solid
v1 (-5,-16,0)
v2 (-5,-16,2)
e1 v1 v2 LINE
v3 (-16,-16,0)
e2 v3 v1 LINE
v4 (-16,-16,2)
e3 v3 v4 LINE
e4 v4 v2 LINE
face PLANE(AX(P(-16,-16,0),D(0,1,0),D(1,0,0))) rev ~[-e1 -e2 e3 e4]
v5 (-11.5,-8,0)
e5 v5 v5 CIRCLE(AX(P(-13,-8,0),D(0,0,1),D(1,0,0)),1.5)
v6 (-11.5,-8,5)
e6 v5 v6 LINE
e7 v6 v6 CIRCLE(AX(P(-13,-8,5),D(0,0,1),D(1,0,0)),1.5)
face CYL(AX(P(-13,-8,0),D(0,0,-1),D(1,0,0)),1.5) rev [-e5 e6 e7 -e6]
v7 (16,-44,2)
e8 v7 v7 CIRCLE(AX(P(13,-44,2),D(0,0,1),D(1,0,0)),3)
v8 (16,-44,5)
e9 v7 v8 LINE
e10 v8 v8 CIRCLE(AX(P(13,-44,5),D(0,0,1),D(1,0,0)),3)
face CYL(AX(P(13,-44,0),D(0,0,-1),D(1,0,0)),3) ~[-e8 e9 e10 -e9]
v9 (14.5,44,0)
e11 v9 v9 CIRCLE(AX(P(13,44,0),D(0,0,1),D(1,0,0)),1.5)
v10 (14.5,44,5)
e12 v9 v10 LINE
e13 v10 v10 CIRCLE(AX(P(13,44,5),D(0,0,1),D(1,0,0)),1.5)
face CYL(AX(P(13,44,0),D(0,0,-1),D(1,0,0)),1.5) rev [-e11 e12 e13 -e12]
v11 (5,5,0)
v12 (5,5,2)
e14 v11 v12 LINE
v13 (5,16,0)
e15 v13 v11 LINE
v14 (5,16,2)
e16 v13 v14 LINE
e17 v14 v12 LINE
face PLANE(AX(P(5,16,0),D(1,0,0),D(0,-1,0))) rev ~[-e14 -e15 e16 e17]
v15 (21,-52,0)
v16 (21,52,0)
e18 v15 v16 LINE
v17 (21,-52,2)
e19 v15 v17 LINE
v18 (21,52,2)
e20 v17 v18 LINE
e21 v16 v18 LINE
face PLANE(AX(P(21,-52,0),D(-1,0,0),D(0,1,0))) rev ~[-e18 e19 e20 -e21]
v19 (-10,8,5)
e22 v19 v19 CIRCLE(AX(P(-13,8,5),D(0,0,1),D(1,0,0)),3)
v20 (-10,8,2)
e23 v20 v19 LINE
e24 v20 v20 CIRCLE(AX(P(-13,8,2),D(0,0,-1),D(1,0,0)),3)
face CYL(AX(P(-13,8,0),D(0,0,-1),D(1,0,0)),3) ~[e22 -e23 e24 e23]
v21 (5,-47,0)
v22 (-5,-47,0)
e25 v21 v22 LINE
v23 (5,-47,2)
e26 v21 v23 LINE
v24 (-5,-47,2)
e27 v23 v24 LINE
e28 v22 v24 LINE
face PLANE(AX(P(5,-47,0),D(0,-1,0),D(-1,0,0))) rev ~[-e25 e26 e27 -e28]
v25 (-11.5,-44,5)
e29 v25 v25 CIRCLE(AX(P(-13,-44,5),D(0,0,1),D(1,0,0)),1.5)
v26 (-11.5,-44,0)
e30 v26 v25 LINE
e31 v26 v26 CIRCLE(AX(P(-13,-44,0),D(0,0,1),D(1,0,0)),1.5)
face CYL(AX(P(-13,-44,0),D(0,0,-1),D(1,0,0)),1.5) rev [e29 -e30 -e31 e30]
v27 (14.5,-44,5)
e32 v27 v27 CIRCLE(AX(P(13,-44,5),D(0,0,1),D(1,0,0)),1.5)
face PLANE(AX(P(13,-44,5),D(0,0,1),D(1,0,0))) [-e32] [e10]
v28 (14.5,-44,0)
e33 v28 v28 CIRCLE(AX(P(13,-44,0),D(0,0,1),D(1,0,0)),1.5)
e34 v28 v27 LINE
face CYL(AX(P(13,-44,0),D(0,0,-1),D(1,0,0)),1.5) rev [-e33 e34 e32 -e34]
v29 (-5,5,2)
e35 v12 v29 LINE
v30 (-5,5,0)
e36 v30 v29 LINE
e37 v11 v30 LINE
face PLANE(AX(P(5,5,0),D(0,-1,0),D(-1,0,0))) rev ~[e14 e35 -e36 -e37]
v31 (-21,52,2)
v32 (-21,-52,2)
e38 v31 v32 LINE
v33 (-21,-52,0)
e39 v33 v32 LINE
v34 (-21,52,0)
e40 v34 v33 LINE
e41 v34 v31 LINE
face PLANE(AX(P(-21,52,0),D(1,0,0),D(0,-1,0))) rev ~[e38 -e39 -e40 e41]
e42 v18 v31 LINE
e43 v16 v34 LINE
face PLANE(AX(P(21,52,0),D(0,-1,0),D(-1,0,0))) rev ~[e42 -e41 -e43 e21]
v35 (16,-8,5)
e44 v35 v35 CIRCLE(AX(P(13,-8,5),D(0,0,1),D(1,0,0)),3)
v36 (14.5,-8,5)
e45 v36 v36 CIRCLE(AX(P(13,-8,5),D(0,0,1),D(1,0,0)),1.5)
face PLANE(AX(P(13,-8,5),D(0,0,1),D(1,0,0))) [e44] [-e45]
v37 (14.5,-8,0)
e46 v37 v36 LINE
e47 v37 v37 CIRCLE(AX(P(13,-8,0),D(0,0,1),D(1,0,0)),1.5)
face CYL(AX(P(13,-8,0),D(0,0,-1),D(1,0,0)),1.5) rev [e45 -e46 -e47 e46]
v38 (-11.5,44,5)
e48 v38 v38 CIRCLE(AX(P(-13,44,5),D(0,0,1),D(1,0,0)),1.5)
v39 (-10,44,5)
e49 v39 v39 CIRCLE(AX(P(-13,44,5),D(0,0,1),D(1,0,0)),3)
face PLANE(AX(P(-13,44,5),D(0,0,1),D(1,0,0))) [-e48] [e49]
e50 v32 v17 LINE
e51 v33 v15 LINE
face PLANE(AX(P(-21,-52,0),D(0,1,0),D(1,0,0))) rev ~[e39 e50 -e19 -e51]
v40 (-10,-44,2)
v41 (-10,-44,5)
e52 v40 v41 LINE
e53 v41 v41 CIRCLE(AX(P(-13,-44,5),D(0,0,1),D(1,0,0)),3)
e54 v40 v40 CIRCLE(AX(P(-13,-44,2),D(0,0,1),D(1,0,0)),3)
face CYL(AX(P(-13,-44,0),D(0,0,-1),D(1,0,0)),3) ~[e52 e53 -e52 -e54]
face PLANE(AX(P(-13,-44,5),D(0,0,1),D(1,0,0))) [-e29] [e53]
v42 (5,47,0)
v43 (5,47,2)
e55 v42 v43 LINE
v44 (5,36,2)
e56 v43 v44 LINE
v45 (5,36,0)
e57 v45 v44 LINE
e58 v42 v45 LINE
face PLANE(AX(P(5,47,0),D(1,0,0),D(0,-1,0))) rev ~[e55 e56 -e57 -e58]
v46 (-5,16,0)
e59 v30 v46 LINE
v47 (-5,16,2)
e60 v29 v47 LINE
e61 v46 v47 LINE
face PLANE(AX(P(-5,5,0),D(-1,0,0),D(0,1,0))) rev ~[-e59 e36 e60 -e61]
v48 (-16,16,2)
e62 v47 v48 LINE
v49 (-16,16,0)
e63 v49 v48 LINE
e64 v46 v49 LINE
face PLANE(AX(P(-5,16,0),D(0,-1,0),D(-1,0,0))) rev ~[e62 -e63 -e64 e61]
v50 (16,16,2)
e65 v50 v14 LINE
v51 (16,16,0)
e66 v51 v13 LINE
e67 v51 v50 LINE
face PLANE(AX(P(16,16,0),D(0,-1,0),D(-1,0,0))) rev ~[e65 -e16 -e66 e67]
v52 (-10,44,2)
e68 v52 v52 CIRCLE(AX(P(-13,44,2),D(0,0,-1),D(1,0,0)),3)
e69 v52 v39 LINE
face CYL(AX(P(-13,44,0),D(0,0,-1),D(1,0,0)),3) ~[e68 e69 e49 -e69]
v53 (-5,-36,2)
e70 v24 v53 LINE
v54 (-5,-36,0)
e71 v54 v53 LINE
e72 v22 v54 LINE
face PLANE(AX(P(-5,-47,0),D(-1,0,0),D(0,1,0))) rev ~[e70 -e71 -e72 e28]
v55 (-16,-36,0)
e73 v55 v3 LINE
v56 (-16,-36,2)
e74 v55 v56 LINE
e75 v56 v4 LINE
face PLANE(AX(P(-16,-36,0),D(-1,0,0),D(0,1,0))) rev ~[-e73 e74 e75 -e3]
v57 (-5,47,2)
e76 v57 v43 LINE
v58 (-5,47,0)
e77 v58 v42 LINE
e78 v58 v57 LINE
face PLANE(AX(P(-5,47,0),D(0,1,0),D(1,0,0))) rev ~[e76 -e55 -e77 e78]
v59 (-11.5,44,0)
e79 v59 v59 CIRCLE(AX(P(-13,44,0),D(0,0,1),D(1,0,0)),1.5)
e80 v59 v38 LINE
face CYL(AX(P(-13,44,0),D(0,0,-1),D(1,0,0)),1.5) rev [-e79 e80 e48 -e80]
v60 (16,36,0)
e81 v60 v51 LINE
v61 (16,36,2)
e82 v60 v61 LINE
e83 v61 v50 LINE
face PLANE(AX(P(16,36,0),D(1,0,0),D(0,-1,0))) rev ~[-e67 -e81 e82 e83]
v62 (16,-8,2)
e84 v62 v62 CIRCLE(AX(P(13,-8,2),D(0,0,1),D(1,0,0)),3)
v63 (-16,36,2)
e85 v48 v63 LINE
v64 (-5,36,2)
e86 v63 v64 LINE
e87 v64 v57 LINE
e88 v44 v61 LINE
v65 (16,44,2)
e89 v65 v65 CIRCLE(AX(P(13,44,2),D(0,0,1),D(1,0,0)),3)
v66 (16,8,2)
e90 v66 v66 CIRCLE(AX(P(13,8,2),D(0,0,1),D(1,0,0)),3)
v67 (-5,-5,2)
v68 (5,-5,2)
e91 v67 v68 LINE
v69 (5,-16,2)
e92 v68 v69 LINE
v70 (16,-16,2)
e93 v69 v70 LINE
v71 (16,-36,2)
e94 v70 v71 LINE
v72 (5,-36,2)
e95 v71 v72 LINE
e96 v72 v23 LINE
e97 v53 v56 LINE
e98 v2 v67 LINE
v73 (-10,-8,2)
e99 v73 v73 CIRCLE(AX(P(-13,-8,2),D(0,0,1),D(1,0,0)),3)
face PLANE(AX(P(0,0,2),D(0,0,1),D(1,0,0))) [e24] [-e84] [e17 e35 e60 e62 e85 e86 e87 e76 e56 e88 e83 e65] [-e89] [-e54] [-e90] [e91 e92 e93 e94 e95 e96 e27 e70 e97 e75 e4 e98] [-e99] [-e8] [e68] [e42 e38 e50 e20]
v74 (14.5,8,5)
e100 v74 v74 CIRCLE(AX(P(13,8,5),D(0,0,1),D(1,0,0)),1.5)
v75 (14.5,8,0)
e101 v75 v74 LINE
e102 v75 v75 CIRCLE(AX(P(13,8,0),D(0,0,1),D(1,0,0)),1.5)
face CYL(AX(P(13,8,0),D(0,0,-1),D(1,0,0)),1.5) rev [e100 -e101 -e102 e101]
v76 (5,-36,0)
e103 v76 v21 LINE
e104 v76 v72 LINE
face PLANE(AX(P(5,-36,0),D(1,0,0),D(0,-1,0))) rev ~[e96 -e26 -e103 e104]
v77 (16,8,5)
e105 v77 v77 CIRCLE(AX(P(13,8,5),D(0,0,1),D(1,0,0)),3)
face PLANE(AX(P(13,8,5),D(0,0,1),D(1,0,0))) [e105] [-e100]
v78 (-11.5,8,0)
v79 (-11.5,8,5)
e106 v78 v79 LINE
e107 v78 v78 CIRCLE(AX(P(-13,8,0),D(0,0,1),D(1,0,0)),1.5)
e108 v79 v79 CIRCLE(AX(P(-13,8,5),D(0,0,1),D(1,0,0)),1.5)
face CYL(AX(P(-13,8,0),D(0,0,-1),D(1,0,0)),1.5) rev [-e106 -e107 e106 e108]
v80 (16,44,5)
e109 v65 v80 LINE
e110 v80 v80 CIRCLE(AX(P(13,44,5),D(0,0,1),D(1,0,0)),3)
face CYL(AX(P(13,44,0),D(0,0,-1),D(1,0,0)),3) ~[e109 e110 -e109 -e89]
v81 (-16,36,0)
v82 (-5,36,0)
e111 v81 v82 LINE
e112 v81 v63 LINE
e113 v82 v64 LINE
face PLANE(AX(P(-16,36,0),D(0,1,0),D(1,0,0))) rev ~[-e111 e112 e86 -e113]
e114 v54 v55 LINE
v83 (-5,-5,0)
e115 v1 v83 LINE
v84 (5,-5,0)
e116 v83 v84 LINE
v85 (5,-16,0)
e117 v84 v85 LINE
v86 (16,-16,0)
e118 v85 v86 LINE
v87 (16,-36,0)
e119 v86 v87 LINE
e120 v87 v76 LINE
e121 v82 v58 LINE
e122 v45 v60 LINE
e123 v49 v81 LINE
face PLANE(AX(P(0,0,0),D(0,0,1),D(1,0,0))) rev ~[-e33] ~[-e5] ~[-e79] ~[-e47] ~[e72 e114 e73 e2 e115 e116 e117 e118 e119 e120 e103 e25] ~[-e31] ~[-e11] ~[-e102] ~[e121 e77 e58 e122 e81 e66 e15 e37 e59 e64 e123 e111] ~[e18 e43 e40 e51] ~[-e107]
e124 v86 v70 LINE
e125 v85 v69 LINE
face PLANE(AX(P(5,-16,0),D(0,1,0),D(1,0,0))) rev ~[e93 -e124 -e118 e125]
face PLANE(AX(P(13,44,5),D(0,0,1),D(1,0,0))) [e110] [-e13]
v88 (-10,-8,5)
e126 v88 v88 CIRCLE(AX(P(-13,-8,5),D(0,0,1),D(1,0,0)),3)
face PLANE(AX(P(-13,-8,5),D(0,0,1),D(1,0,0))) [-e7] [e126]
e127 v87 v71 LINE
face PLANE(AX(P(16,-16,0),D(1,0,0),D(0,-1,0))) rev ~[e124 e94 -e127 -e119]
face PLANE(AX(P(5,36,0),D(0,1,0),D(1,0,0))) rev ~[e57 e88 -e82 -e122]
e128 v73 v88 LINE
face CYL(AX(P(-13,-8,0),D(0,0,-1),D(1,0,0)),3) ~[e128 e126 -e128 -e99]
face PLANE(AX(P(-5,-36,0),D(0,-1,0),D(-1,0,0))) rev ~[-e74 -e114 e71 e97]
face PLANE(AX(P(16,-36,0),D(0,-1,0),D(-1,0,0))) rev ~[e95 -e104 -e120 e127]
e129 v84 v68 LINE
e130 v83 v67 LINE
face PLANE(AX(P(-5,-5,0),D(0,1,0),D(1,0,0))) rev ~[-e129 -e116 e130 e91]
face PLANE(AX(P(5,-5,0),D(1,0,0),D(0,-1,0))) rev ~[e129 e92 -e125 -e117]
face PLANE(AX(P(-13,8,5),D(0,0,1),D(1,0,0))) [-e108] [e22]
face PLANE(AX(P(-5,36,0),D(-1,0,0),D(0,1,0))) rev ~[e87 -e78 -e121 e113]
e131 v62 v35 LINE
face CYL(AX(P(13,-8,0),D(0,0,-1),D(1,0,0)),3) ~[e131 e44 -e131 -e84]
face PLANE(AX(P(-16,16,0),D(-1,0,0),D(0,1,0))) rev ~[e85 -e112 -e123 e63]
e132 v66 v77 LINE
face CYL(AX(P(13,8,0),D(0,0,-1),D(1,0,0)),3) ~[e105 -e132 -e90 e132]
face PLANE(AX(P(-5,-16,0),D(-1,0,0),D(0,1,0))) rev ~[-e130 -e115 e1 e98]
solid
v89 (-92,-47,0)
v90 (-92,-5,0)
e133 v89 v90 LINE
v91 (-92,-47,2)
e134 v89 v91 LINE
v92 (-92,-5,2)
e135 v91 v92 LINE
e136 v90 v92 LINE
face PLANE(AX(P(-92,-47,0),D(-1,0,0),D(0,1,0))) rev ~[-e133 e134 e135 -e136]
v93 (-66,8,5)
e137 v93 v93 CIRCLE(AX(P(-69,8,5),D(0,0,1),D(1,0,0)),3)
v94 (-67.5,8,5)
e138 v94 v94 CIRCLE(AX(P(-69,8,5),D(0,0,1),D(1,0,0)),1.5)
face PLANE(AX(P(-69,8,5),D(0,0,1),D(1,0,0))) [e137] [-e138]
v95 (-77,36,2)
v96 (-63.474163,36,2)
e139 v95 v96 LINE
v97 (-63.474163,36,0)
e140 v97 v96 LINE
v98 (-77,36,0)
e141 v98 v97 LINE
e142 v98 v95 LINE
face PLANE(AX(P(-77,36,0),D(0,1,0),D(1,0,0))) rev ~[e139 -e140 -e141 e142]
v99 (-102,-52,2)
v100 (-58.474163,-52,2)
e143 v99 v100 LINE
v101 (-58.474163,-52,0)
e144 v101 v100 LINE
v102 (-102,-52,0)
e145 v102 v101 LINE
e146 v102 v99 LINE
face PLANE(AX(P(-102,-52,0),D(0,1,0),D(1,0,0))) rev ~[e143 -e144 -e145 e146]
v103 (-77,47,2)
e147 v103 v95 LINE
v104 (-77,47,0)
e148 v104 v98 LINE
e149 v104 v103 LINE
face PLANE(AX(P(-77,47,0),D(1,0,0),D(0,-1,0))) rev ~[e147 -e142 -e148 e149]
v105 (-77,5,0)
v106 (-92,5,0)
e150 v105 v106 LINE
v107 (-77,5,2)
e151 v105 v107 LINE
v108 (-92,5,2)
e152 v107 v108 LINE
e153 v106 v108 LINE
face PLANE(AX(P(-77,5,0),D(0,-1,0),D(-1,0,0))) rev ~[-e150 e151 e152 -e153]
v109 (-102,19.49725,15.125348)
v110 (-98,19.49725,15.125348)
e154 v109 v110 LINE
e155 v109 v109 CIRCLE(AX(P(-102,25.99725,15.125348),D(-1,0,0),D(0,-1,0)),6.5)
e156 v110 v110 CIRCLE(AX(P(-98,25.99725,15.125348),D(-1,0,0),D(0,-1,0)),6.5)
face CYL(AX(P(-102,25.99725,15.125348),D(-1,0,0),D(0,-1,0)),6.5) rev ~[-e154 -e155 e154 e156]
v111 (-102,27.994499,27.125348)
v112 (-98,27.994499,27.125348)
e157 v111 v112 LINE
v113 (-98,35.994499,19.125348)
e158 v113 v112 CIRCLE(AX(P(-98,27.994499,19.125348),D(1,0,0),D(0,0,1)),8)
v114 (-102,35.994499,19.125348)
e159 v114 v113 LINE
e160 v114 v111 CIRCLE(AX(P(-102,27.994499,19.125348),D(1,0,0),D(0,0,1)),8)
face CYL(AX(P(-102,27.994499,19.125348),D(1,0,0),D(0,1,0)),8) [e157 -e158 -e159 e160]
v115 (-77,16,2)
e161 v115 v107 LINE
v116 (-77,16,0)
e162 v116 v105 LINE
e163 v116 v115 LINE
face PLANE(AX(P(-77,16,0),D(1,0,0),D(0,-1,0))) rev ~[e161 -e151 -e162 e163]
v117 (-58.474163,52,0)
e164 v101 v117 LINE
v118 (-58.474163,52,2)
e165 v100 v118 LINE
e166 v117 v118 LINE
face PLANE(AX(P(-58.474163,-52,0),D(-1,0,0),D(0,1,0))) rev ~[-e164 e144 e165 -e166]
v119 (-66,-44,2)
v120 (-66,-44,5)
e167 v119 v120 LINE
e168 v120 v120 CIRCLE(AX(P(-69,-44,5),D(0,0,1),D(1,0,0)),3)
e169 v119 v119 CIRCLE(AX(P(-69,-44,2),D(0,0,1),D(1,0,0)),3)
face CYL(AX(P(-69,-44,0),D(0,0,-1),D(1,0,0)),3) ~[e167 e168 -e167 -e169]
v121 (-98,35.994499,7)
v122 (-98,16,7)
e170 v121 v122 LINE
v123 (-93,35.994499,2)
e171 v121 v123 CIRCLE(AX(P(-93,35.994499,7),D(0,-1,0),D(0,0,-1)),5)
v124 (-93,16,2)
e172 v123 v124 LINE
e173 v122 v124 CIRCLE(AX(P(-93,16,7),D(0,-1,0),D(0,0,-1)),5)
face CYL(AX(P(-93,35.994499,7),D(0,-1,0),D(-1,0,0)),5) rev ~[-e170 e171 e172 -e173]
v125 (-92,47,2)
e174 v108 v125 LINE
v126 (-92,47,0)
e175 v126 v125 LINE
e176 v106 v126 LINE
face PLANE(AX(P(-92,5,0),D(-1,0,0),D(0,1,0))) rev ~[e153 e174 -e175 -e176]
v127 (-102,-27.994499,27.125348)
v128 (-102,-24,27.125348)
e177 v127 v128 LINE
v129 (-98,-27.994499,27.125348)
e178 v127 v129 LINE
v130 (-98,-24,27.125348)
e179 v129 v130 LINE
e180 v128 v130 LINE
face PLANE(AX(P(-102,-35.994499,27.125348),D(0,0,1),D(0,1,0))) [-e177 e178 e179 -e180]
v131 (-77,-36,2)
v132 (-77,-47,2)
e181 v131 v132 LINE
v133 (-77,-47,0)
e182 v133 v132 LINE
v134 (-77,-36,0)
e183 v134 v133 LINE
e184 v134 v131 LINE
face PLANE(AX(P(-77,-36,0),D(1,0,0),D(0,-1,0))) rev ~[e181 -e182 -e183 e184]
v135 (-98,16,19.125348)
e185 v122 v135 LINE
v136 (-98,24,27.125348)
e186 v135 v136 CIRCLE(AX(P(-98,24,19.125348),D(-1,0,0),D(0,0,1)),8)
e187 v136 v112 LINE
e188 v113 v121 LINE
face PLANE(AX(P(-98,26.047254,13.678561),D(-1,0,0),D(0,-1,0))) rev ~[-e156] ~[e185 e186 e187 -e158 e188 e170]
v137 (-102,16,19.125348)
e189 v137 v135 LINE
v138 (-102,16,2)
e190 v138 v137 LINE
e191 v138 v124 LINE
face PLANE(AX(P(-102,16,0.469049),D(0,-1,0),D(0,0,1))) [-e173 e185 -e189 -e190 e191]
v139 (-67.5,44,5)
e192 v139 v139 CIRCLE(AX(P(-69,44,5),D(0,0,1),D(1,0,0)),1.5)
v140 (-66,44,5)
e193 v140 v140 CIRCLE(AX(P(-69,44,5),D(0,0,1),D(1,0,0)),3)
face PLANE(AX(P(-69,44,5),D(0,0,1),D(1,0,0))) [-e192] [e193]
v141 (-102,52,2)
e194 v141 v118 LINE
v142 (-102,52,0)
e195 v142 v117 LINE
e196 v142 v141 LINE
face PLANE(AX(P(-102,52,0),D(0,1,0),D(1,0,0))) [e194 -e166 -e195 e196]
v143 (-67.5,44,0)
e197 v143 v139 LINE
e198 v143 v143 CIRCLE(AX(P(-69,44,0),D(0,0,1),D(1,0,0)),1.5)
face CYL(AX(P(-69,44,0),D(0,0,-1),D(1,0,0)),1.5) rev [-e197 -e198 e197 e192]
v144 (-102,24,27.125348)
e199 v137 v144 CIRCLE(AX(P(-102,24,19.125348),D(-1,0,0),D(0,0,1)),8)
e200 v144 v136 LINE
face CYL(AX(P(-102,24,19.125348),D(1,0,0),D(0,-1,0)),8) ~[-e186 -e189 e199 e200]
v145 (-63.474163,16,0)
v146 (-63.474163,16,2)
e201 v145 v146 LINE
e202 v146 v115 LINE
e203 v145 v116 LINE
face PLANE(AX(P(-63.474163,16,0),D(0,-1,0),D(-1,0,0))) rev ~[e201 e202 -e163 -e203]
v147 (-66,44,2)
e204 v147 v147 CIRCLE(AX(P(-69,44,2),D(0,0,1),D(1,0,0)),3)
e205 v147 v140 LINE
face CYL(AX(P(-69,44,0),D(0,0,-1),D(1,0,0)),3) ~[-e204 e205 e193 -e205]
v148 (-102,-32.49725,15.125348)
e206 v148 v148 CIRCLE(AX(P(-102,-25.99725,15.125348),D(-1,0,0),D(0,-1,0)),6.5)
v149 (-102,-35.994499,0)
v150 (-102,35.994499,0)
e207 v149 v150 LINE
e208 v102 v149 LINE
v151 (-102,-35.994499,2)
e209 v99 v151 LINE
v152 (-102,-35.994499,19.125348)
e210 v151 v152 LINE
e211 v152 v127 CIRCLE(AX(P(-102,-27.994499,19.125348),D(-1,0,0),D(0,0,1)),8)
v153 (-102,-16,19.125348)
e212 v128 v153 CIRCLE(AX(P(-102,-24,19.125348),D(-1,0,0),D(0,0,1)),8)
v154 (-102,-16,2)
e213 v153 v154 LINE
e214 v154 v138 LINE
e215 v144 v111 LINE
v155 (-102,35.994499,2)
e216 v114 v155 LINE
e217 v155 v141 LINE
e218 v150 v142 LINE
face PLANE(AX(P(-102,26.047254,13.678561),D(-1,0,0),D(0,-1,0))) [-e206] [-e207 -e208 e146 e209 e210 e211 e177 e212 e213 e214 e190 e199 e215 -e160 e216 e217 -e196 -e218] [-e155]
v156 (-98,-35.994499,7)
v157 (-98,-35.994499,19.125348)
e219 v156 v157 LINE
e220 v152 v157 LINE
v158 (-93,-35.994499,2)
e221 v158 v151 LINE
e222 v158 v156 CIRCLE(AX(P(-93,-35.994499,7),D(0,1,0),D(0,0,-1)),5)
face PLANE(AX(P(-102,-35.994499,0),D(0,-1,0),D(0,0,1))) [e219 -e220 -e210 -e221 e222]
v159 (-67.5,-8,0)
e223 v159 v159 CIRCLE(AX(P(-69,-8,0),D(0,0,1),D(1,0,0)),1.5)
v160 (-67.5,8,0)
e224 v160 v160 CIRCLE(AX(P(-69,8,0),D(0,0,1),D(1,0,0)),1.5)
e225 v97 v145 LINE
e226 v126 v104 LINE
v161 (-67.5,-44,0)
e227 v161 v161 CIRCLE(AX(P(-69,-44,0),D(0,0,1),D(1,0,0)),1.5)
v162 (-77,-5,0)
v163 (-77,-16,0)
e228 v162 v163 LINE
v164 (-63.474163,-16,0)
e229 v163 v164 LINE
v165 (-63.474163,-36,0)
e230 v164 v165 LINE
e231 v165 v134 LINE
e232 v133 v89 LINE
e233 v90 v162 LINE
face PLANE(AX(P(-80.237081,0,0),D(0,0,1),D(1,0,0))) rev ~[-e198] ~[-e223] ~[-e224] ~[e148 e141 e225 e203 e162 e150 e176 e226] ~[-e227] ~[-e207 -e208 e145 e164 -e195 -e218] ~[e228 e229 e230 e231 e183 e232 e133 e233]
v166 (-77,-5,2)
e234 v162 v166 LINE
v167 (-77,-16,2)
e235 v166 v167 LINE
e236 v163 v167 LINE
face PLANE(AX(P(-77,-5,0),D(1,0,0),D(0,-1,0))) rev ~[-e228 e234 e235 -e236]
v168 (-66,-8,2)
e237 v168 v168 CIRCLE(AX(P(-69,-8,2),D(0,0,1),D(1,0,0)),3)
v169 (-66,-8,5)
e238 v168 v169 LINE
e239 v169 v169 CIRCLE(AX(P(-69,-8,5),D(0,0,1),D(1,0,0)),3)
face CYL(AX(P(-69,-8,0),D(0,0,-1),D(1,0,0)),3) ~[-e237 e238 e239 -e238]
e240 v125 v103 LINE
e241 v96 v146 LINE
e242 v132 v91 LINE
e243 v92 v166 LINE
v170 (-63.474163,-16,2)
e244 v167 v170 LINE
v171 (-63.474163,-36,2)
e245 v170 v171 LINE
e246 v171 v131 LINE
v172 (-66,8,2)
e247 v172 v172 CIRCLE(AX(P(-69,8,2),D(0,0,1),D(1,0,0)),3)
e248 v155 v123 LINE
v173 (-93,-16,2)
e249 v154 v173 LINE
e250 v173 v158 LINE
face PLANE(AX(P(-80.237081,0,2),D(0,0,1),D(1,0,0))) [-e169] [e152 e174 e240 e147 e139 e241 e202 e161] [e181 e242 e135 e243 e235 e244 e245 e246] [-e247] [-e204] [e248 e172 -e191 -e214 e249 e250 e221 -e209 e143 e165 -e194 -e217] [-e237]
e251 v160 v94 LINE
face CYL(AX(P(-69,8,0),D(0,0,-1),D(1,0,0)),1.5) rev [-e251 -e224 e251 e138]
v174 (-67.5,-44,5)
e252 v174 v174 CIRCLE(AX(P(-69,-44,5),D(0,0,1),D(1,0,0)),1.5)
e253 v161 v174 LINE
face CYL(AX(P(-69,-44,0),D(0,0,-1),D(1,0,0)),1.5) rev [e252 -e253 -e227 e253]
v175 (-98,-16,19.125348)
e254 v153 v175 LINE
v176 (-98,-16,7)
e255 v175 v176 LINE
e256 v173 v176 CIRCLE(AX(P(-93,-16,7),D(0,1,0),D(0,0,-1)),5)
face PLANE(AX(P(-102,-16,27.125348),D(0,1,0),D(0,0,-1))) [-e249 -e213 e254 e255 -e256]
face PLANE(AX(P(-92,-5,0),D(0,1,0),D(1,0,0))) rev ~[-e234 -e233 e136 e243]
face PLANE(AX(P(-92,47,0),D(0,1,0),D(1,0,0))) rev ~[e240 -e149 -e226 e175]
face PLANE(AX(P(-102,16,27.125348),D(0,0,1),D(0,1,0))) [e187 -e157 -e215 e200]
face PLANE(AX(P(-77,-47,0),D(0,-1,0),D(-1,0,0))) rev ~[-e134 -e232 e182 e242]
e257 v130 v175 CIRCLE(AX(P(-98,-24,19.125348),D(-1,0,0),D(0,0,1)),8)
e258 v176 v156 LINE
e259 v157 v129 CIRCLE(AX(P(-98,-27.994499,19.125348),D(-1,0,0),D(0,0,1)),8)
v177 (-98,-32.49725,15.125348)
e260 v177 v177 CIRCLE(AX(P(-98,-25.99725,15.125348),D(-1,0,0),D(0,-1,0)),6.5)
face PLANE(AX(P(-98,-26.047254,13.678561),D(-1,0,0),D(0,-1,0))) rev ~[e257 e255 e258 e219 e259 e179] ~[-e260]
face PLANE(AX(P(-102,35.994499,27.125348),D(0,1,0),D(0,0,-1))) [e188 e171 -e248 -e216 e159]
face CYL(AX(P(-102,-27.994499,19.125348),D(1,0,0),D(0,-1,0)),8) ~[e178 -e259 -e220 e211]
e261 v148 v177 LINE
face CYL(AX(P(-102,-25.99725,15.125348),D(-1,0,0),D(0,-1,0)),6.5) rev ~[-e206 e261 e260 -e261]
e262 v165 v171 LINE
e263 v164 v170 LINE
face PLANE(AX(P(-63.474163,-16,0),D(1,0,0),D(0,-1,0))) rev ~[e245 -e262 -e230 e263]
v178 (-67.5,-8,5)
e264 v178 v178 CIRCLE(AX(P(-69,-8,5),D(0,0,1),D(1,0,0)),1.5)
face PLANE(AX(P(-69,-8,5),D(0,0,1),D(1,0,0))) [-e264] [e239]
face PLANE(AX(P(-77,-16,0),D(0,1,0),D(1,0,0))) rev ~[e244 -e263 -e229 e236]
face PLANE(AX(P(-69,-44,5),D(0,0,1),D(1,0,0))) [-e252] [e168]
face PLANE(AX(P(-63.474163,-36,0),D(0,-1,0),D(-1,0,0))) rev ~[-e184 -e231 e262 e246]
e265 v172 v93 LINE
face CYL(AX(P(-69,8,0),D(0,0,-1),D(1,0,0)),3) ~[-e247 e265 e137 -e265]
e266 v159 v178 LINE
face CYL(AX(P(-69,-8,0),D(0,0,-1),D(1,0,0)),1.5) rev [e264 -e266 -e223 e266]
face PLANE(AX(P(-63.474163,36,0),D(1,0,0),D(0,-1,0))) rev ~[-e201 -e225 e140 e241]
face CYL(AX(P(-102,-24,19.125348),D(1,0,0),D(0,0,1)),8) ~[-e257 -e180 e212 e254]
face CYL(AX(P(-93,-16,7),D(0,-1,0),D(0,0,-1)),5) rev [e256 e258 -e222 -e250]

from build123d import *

# Parameters (mm, degrees)
F0_R     = 3
F0_R_2   = 1.5
F1_DEPTH = 2
F0_W     = 43.5258374241
F0_H     = 104
F2_DEPTH = 5
F4_R     = 6.5
F5_DEPTH = 4
F6_R     = 5
F7_R     = 8


# Not quite as in the source:
# - a feature names something its author has since deleted; it is built from what else it names


with BuildPart() as f1:
    # F0 (on Top) → F1 (new body)
    with BuildSketch(Plane.XY):
        Polygon((21, 52), (20, 52), (-20, 52), (-21, 52), (-21, -52), (-20, -52), (20, -52), (21, -52), align=None)
        with Locations((-13, -44)):
            Circle(F0_R, mode=Mode.SUBTRACT)
        with Locations((13, -44)):
            Circle(F0_R, mode=Mode.SUBTRACT)
        with Locations((-13, -8)):
            Circle(F0_R, mode=Mode.SUBTRACT)
        Polygon((-5, -16), (-5, -5), (5, -5), (5, -16), (16, -16), (16, -36), (5, -36), (5, -47), (-5, -47), (-5, -36), (-16, -36), (-16, -16), align=None, mode=Mode.SUBTRACT)
        with Locations((13, -8)):
            Circle(F0_R, mode=Mode.SUBTRACT)
        with Locations((-13, 8)):
            Circle(F0_R, mode=Mode.SUBTRACT)
        with Locations((13, 8)):
            Circle(F0_R, mode=Mode.SUBTRACT)
        with Locations((-13, 44)):
            Circle(F0_R, mode=Mode.SUBTRACT)
        Polygon((-5, 36), (-5, 47), (5, 47), (5, 36), (16, 36), (16, 16), (5, 16), (5, 5), (-5, 5), (-5, 16), (-16, 16), (-16, 36), align=None, mode=Mode.SUBTRACT)
        with Locations((13, 44)):
            Circle(F0_R, mode=Mode.SUBTRACT)
        with Locations((-13, 8)):
            Circle(F0_R)
        with Locations((-13, 8)):
            Circle(F0_R_2, mode=Mode.SUBTRACT)
        with Locations((-13, 44)):
            Circle(F0_R)
        with Locations((-13, 44)):
            Circle(F0_R_2, mode=Mode.SUBTRACT)
    extrude(amount=F1_DEPTH)

    # F0 (on Top) → F2, piece 2 (join)
    with BuildSketch(Plane.XY):
        with Locations((-13, 8)):
            Circle(F0_R)
        with Locations((-13, 8)):
            Circle(F0_R_2, mode=Mode.SUBTRACT)
        with Locations((-13, 44)):
            Circle(F0_R)
        with Locations((-13, 44)):
            Circle(F0_R_2, mode=Mode.SUBTRACT)
        with Locations((13, 44)):
            Circle(F0_R)
        with Locations((13, 44)):
            Circle(F0_R_2, mode=Mode.SUBTRACT)
        with Locations((13, 8)):
            Circle(F0_R)
        with Locations((13, 8)):
            Circle(F0_R_2, mode=Mode.SUBTRACT)
        with Locations((-13, -8)):
            Circle(F0_R)
        with Locations((-13, -8)):
            Circle(F0_R_2, mode=Mode.SUBTRACT)
        with Locations((13, -8)):
            Circle(F0_R)
        with Locations((13, -8)):
            Circle(F0_R_2, mode=Mode.SUBTRACT)
        with Locations((-13, -44)):
            Circle(F0_R)
        with Locations((-13, -44)):
            Circle(F0_R_2, mode=Mode.SUBTRACT)
        with Locations((13, -44)):
            Circle(F0_R)
        with Locations((13, -44)):
            Circle(F0_R_2, mode=Mode.SUBTRACT)
    extrude(amount=F2_DEPTH)


with BuildPart() as f1b:
    # F0 (on Top) → F1, piece 2 (new body)
    with BuildSketch(Plane.XY):
        with Locations((-80.2370812879, 0)):
            Rectangle(F0_W, F0_H)
        with Locations((-69, -44)):
            Circle(F0_R, mode=Mode.SUBTRACT)
        Polygon((-77, -47), (-92, -47), (-92, -5), (-77, -5), (-77, -16), (-63.4741625759, -16), (-63.4741625759, -36), (-77, -36), align=None, mode=Mode.SUBTRACT)
        with Locations((-69, -8)):
            Circle(F0_R, mode=Mode.SUBTRACT)
        with Locations((-69, 8)):
            Circle(F0_R, mode=Mode.SUBTRACT)
        Polygon((-92, 47), (-77, 47), (-77, 36), (-63.4741625759, 36), (-63.4741625759, 16), (-77, 16), (-77, 5), (-92, 5), align=None, mode=Mode.SUBTRACT)
        with Locations((-69, 44)):
            Circle(F0_R, mode=Mode.SUBTRACT)
    extrude(amount=F1_DEPTH)

    # F0 (on Top) → F2 (join)
    with BuildSketch(Plane.XY):
        with Locations((-69, 44)):
            Circle(F0_R)
        with Locations((-69, 44)):
            Circle(F0_R_2, mode=Mode.SUBTRACT)
        with Locations((-69, 8)):
            Circle(F0_R)
        with Locations((-69, 8)):
            Circle(F0_R_2, mode=Mode.SUBTRACT)
        with Locations((-69, -8)):
            Circle(F0_R)
        with Locations((-69, -8)):
            Circle(F0_R_2, mode=Mode.SUBTRACT)
        with Locations((-69, -44)):
            Circle(F0_R)
        with Locations((-69, -44)):
            Circle(F0_R_2, mode=Mode.SUBTRACT)
    extrude(amount=F2_DEPTH)

    # F4 (on face) → F5 (join)
    with BuildSketch(Plane(origin=(-102, 0, 0), x_dir=(0, -1, 0), z_dir=(-1, 0, 0))):
        Polygon((-16, 27.1253478074), (-35.9944990628, 27.1253478074), (-35.9944990628, 0), (-16, 0.4690492824), align=None)
        with Locations((-25.9972495314, 15.1253478074)):
            Circle(F4_R, mode=Mode.SUBTRACT)
        Polygon((16, 0.4690492824), (35.9944990628, 0), (35.9944990628, 27.1253478074), (16, 27.1253478074), align=None)
        with Locations((25.9972495314, 15.1253478074)):
            Circle(F4_R, mode=Mode.SUBTRACT)
    extrude(amount=-F5_DEPTH)

    # F6
    f6_edges = [f1b.edges().sort_by_distance(p)[0] for p in [
        (-98, 25.99725, 2),
        (-98, -25.99725, 2),
    ]]
    fillet(f6_edges, radius=F6_R)

    # F7
    f7_edges = [f1b.edges().sort_by_distance(p)[0] for p in [
        (-100, 35.994499, 27.125348),
        (-100, -16, 27.125348),
        (-100, 16, 27.125348),
        (-100, -35.994499, 27.125348),
    ]]
    fillet(f7_edges, radius=F7_R)


solid = Compound([f1.part, f1b.part])
